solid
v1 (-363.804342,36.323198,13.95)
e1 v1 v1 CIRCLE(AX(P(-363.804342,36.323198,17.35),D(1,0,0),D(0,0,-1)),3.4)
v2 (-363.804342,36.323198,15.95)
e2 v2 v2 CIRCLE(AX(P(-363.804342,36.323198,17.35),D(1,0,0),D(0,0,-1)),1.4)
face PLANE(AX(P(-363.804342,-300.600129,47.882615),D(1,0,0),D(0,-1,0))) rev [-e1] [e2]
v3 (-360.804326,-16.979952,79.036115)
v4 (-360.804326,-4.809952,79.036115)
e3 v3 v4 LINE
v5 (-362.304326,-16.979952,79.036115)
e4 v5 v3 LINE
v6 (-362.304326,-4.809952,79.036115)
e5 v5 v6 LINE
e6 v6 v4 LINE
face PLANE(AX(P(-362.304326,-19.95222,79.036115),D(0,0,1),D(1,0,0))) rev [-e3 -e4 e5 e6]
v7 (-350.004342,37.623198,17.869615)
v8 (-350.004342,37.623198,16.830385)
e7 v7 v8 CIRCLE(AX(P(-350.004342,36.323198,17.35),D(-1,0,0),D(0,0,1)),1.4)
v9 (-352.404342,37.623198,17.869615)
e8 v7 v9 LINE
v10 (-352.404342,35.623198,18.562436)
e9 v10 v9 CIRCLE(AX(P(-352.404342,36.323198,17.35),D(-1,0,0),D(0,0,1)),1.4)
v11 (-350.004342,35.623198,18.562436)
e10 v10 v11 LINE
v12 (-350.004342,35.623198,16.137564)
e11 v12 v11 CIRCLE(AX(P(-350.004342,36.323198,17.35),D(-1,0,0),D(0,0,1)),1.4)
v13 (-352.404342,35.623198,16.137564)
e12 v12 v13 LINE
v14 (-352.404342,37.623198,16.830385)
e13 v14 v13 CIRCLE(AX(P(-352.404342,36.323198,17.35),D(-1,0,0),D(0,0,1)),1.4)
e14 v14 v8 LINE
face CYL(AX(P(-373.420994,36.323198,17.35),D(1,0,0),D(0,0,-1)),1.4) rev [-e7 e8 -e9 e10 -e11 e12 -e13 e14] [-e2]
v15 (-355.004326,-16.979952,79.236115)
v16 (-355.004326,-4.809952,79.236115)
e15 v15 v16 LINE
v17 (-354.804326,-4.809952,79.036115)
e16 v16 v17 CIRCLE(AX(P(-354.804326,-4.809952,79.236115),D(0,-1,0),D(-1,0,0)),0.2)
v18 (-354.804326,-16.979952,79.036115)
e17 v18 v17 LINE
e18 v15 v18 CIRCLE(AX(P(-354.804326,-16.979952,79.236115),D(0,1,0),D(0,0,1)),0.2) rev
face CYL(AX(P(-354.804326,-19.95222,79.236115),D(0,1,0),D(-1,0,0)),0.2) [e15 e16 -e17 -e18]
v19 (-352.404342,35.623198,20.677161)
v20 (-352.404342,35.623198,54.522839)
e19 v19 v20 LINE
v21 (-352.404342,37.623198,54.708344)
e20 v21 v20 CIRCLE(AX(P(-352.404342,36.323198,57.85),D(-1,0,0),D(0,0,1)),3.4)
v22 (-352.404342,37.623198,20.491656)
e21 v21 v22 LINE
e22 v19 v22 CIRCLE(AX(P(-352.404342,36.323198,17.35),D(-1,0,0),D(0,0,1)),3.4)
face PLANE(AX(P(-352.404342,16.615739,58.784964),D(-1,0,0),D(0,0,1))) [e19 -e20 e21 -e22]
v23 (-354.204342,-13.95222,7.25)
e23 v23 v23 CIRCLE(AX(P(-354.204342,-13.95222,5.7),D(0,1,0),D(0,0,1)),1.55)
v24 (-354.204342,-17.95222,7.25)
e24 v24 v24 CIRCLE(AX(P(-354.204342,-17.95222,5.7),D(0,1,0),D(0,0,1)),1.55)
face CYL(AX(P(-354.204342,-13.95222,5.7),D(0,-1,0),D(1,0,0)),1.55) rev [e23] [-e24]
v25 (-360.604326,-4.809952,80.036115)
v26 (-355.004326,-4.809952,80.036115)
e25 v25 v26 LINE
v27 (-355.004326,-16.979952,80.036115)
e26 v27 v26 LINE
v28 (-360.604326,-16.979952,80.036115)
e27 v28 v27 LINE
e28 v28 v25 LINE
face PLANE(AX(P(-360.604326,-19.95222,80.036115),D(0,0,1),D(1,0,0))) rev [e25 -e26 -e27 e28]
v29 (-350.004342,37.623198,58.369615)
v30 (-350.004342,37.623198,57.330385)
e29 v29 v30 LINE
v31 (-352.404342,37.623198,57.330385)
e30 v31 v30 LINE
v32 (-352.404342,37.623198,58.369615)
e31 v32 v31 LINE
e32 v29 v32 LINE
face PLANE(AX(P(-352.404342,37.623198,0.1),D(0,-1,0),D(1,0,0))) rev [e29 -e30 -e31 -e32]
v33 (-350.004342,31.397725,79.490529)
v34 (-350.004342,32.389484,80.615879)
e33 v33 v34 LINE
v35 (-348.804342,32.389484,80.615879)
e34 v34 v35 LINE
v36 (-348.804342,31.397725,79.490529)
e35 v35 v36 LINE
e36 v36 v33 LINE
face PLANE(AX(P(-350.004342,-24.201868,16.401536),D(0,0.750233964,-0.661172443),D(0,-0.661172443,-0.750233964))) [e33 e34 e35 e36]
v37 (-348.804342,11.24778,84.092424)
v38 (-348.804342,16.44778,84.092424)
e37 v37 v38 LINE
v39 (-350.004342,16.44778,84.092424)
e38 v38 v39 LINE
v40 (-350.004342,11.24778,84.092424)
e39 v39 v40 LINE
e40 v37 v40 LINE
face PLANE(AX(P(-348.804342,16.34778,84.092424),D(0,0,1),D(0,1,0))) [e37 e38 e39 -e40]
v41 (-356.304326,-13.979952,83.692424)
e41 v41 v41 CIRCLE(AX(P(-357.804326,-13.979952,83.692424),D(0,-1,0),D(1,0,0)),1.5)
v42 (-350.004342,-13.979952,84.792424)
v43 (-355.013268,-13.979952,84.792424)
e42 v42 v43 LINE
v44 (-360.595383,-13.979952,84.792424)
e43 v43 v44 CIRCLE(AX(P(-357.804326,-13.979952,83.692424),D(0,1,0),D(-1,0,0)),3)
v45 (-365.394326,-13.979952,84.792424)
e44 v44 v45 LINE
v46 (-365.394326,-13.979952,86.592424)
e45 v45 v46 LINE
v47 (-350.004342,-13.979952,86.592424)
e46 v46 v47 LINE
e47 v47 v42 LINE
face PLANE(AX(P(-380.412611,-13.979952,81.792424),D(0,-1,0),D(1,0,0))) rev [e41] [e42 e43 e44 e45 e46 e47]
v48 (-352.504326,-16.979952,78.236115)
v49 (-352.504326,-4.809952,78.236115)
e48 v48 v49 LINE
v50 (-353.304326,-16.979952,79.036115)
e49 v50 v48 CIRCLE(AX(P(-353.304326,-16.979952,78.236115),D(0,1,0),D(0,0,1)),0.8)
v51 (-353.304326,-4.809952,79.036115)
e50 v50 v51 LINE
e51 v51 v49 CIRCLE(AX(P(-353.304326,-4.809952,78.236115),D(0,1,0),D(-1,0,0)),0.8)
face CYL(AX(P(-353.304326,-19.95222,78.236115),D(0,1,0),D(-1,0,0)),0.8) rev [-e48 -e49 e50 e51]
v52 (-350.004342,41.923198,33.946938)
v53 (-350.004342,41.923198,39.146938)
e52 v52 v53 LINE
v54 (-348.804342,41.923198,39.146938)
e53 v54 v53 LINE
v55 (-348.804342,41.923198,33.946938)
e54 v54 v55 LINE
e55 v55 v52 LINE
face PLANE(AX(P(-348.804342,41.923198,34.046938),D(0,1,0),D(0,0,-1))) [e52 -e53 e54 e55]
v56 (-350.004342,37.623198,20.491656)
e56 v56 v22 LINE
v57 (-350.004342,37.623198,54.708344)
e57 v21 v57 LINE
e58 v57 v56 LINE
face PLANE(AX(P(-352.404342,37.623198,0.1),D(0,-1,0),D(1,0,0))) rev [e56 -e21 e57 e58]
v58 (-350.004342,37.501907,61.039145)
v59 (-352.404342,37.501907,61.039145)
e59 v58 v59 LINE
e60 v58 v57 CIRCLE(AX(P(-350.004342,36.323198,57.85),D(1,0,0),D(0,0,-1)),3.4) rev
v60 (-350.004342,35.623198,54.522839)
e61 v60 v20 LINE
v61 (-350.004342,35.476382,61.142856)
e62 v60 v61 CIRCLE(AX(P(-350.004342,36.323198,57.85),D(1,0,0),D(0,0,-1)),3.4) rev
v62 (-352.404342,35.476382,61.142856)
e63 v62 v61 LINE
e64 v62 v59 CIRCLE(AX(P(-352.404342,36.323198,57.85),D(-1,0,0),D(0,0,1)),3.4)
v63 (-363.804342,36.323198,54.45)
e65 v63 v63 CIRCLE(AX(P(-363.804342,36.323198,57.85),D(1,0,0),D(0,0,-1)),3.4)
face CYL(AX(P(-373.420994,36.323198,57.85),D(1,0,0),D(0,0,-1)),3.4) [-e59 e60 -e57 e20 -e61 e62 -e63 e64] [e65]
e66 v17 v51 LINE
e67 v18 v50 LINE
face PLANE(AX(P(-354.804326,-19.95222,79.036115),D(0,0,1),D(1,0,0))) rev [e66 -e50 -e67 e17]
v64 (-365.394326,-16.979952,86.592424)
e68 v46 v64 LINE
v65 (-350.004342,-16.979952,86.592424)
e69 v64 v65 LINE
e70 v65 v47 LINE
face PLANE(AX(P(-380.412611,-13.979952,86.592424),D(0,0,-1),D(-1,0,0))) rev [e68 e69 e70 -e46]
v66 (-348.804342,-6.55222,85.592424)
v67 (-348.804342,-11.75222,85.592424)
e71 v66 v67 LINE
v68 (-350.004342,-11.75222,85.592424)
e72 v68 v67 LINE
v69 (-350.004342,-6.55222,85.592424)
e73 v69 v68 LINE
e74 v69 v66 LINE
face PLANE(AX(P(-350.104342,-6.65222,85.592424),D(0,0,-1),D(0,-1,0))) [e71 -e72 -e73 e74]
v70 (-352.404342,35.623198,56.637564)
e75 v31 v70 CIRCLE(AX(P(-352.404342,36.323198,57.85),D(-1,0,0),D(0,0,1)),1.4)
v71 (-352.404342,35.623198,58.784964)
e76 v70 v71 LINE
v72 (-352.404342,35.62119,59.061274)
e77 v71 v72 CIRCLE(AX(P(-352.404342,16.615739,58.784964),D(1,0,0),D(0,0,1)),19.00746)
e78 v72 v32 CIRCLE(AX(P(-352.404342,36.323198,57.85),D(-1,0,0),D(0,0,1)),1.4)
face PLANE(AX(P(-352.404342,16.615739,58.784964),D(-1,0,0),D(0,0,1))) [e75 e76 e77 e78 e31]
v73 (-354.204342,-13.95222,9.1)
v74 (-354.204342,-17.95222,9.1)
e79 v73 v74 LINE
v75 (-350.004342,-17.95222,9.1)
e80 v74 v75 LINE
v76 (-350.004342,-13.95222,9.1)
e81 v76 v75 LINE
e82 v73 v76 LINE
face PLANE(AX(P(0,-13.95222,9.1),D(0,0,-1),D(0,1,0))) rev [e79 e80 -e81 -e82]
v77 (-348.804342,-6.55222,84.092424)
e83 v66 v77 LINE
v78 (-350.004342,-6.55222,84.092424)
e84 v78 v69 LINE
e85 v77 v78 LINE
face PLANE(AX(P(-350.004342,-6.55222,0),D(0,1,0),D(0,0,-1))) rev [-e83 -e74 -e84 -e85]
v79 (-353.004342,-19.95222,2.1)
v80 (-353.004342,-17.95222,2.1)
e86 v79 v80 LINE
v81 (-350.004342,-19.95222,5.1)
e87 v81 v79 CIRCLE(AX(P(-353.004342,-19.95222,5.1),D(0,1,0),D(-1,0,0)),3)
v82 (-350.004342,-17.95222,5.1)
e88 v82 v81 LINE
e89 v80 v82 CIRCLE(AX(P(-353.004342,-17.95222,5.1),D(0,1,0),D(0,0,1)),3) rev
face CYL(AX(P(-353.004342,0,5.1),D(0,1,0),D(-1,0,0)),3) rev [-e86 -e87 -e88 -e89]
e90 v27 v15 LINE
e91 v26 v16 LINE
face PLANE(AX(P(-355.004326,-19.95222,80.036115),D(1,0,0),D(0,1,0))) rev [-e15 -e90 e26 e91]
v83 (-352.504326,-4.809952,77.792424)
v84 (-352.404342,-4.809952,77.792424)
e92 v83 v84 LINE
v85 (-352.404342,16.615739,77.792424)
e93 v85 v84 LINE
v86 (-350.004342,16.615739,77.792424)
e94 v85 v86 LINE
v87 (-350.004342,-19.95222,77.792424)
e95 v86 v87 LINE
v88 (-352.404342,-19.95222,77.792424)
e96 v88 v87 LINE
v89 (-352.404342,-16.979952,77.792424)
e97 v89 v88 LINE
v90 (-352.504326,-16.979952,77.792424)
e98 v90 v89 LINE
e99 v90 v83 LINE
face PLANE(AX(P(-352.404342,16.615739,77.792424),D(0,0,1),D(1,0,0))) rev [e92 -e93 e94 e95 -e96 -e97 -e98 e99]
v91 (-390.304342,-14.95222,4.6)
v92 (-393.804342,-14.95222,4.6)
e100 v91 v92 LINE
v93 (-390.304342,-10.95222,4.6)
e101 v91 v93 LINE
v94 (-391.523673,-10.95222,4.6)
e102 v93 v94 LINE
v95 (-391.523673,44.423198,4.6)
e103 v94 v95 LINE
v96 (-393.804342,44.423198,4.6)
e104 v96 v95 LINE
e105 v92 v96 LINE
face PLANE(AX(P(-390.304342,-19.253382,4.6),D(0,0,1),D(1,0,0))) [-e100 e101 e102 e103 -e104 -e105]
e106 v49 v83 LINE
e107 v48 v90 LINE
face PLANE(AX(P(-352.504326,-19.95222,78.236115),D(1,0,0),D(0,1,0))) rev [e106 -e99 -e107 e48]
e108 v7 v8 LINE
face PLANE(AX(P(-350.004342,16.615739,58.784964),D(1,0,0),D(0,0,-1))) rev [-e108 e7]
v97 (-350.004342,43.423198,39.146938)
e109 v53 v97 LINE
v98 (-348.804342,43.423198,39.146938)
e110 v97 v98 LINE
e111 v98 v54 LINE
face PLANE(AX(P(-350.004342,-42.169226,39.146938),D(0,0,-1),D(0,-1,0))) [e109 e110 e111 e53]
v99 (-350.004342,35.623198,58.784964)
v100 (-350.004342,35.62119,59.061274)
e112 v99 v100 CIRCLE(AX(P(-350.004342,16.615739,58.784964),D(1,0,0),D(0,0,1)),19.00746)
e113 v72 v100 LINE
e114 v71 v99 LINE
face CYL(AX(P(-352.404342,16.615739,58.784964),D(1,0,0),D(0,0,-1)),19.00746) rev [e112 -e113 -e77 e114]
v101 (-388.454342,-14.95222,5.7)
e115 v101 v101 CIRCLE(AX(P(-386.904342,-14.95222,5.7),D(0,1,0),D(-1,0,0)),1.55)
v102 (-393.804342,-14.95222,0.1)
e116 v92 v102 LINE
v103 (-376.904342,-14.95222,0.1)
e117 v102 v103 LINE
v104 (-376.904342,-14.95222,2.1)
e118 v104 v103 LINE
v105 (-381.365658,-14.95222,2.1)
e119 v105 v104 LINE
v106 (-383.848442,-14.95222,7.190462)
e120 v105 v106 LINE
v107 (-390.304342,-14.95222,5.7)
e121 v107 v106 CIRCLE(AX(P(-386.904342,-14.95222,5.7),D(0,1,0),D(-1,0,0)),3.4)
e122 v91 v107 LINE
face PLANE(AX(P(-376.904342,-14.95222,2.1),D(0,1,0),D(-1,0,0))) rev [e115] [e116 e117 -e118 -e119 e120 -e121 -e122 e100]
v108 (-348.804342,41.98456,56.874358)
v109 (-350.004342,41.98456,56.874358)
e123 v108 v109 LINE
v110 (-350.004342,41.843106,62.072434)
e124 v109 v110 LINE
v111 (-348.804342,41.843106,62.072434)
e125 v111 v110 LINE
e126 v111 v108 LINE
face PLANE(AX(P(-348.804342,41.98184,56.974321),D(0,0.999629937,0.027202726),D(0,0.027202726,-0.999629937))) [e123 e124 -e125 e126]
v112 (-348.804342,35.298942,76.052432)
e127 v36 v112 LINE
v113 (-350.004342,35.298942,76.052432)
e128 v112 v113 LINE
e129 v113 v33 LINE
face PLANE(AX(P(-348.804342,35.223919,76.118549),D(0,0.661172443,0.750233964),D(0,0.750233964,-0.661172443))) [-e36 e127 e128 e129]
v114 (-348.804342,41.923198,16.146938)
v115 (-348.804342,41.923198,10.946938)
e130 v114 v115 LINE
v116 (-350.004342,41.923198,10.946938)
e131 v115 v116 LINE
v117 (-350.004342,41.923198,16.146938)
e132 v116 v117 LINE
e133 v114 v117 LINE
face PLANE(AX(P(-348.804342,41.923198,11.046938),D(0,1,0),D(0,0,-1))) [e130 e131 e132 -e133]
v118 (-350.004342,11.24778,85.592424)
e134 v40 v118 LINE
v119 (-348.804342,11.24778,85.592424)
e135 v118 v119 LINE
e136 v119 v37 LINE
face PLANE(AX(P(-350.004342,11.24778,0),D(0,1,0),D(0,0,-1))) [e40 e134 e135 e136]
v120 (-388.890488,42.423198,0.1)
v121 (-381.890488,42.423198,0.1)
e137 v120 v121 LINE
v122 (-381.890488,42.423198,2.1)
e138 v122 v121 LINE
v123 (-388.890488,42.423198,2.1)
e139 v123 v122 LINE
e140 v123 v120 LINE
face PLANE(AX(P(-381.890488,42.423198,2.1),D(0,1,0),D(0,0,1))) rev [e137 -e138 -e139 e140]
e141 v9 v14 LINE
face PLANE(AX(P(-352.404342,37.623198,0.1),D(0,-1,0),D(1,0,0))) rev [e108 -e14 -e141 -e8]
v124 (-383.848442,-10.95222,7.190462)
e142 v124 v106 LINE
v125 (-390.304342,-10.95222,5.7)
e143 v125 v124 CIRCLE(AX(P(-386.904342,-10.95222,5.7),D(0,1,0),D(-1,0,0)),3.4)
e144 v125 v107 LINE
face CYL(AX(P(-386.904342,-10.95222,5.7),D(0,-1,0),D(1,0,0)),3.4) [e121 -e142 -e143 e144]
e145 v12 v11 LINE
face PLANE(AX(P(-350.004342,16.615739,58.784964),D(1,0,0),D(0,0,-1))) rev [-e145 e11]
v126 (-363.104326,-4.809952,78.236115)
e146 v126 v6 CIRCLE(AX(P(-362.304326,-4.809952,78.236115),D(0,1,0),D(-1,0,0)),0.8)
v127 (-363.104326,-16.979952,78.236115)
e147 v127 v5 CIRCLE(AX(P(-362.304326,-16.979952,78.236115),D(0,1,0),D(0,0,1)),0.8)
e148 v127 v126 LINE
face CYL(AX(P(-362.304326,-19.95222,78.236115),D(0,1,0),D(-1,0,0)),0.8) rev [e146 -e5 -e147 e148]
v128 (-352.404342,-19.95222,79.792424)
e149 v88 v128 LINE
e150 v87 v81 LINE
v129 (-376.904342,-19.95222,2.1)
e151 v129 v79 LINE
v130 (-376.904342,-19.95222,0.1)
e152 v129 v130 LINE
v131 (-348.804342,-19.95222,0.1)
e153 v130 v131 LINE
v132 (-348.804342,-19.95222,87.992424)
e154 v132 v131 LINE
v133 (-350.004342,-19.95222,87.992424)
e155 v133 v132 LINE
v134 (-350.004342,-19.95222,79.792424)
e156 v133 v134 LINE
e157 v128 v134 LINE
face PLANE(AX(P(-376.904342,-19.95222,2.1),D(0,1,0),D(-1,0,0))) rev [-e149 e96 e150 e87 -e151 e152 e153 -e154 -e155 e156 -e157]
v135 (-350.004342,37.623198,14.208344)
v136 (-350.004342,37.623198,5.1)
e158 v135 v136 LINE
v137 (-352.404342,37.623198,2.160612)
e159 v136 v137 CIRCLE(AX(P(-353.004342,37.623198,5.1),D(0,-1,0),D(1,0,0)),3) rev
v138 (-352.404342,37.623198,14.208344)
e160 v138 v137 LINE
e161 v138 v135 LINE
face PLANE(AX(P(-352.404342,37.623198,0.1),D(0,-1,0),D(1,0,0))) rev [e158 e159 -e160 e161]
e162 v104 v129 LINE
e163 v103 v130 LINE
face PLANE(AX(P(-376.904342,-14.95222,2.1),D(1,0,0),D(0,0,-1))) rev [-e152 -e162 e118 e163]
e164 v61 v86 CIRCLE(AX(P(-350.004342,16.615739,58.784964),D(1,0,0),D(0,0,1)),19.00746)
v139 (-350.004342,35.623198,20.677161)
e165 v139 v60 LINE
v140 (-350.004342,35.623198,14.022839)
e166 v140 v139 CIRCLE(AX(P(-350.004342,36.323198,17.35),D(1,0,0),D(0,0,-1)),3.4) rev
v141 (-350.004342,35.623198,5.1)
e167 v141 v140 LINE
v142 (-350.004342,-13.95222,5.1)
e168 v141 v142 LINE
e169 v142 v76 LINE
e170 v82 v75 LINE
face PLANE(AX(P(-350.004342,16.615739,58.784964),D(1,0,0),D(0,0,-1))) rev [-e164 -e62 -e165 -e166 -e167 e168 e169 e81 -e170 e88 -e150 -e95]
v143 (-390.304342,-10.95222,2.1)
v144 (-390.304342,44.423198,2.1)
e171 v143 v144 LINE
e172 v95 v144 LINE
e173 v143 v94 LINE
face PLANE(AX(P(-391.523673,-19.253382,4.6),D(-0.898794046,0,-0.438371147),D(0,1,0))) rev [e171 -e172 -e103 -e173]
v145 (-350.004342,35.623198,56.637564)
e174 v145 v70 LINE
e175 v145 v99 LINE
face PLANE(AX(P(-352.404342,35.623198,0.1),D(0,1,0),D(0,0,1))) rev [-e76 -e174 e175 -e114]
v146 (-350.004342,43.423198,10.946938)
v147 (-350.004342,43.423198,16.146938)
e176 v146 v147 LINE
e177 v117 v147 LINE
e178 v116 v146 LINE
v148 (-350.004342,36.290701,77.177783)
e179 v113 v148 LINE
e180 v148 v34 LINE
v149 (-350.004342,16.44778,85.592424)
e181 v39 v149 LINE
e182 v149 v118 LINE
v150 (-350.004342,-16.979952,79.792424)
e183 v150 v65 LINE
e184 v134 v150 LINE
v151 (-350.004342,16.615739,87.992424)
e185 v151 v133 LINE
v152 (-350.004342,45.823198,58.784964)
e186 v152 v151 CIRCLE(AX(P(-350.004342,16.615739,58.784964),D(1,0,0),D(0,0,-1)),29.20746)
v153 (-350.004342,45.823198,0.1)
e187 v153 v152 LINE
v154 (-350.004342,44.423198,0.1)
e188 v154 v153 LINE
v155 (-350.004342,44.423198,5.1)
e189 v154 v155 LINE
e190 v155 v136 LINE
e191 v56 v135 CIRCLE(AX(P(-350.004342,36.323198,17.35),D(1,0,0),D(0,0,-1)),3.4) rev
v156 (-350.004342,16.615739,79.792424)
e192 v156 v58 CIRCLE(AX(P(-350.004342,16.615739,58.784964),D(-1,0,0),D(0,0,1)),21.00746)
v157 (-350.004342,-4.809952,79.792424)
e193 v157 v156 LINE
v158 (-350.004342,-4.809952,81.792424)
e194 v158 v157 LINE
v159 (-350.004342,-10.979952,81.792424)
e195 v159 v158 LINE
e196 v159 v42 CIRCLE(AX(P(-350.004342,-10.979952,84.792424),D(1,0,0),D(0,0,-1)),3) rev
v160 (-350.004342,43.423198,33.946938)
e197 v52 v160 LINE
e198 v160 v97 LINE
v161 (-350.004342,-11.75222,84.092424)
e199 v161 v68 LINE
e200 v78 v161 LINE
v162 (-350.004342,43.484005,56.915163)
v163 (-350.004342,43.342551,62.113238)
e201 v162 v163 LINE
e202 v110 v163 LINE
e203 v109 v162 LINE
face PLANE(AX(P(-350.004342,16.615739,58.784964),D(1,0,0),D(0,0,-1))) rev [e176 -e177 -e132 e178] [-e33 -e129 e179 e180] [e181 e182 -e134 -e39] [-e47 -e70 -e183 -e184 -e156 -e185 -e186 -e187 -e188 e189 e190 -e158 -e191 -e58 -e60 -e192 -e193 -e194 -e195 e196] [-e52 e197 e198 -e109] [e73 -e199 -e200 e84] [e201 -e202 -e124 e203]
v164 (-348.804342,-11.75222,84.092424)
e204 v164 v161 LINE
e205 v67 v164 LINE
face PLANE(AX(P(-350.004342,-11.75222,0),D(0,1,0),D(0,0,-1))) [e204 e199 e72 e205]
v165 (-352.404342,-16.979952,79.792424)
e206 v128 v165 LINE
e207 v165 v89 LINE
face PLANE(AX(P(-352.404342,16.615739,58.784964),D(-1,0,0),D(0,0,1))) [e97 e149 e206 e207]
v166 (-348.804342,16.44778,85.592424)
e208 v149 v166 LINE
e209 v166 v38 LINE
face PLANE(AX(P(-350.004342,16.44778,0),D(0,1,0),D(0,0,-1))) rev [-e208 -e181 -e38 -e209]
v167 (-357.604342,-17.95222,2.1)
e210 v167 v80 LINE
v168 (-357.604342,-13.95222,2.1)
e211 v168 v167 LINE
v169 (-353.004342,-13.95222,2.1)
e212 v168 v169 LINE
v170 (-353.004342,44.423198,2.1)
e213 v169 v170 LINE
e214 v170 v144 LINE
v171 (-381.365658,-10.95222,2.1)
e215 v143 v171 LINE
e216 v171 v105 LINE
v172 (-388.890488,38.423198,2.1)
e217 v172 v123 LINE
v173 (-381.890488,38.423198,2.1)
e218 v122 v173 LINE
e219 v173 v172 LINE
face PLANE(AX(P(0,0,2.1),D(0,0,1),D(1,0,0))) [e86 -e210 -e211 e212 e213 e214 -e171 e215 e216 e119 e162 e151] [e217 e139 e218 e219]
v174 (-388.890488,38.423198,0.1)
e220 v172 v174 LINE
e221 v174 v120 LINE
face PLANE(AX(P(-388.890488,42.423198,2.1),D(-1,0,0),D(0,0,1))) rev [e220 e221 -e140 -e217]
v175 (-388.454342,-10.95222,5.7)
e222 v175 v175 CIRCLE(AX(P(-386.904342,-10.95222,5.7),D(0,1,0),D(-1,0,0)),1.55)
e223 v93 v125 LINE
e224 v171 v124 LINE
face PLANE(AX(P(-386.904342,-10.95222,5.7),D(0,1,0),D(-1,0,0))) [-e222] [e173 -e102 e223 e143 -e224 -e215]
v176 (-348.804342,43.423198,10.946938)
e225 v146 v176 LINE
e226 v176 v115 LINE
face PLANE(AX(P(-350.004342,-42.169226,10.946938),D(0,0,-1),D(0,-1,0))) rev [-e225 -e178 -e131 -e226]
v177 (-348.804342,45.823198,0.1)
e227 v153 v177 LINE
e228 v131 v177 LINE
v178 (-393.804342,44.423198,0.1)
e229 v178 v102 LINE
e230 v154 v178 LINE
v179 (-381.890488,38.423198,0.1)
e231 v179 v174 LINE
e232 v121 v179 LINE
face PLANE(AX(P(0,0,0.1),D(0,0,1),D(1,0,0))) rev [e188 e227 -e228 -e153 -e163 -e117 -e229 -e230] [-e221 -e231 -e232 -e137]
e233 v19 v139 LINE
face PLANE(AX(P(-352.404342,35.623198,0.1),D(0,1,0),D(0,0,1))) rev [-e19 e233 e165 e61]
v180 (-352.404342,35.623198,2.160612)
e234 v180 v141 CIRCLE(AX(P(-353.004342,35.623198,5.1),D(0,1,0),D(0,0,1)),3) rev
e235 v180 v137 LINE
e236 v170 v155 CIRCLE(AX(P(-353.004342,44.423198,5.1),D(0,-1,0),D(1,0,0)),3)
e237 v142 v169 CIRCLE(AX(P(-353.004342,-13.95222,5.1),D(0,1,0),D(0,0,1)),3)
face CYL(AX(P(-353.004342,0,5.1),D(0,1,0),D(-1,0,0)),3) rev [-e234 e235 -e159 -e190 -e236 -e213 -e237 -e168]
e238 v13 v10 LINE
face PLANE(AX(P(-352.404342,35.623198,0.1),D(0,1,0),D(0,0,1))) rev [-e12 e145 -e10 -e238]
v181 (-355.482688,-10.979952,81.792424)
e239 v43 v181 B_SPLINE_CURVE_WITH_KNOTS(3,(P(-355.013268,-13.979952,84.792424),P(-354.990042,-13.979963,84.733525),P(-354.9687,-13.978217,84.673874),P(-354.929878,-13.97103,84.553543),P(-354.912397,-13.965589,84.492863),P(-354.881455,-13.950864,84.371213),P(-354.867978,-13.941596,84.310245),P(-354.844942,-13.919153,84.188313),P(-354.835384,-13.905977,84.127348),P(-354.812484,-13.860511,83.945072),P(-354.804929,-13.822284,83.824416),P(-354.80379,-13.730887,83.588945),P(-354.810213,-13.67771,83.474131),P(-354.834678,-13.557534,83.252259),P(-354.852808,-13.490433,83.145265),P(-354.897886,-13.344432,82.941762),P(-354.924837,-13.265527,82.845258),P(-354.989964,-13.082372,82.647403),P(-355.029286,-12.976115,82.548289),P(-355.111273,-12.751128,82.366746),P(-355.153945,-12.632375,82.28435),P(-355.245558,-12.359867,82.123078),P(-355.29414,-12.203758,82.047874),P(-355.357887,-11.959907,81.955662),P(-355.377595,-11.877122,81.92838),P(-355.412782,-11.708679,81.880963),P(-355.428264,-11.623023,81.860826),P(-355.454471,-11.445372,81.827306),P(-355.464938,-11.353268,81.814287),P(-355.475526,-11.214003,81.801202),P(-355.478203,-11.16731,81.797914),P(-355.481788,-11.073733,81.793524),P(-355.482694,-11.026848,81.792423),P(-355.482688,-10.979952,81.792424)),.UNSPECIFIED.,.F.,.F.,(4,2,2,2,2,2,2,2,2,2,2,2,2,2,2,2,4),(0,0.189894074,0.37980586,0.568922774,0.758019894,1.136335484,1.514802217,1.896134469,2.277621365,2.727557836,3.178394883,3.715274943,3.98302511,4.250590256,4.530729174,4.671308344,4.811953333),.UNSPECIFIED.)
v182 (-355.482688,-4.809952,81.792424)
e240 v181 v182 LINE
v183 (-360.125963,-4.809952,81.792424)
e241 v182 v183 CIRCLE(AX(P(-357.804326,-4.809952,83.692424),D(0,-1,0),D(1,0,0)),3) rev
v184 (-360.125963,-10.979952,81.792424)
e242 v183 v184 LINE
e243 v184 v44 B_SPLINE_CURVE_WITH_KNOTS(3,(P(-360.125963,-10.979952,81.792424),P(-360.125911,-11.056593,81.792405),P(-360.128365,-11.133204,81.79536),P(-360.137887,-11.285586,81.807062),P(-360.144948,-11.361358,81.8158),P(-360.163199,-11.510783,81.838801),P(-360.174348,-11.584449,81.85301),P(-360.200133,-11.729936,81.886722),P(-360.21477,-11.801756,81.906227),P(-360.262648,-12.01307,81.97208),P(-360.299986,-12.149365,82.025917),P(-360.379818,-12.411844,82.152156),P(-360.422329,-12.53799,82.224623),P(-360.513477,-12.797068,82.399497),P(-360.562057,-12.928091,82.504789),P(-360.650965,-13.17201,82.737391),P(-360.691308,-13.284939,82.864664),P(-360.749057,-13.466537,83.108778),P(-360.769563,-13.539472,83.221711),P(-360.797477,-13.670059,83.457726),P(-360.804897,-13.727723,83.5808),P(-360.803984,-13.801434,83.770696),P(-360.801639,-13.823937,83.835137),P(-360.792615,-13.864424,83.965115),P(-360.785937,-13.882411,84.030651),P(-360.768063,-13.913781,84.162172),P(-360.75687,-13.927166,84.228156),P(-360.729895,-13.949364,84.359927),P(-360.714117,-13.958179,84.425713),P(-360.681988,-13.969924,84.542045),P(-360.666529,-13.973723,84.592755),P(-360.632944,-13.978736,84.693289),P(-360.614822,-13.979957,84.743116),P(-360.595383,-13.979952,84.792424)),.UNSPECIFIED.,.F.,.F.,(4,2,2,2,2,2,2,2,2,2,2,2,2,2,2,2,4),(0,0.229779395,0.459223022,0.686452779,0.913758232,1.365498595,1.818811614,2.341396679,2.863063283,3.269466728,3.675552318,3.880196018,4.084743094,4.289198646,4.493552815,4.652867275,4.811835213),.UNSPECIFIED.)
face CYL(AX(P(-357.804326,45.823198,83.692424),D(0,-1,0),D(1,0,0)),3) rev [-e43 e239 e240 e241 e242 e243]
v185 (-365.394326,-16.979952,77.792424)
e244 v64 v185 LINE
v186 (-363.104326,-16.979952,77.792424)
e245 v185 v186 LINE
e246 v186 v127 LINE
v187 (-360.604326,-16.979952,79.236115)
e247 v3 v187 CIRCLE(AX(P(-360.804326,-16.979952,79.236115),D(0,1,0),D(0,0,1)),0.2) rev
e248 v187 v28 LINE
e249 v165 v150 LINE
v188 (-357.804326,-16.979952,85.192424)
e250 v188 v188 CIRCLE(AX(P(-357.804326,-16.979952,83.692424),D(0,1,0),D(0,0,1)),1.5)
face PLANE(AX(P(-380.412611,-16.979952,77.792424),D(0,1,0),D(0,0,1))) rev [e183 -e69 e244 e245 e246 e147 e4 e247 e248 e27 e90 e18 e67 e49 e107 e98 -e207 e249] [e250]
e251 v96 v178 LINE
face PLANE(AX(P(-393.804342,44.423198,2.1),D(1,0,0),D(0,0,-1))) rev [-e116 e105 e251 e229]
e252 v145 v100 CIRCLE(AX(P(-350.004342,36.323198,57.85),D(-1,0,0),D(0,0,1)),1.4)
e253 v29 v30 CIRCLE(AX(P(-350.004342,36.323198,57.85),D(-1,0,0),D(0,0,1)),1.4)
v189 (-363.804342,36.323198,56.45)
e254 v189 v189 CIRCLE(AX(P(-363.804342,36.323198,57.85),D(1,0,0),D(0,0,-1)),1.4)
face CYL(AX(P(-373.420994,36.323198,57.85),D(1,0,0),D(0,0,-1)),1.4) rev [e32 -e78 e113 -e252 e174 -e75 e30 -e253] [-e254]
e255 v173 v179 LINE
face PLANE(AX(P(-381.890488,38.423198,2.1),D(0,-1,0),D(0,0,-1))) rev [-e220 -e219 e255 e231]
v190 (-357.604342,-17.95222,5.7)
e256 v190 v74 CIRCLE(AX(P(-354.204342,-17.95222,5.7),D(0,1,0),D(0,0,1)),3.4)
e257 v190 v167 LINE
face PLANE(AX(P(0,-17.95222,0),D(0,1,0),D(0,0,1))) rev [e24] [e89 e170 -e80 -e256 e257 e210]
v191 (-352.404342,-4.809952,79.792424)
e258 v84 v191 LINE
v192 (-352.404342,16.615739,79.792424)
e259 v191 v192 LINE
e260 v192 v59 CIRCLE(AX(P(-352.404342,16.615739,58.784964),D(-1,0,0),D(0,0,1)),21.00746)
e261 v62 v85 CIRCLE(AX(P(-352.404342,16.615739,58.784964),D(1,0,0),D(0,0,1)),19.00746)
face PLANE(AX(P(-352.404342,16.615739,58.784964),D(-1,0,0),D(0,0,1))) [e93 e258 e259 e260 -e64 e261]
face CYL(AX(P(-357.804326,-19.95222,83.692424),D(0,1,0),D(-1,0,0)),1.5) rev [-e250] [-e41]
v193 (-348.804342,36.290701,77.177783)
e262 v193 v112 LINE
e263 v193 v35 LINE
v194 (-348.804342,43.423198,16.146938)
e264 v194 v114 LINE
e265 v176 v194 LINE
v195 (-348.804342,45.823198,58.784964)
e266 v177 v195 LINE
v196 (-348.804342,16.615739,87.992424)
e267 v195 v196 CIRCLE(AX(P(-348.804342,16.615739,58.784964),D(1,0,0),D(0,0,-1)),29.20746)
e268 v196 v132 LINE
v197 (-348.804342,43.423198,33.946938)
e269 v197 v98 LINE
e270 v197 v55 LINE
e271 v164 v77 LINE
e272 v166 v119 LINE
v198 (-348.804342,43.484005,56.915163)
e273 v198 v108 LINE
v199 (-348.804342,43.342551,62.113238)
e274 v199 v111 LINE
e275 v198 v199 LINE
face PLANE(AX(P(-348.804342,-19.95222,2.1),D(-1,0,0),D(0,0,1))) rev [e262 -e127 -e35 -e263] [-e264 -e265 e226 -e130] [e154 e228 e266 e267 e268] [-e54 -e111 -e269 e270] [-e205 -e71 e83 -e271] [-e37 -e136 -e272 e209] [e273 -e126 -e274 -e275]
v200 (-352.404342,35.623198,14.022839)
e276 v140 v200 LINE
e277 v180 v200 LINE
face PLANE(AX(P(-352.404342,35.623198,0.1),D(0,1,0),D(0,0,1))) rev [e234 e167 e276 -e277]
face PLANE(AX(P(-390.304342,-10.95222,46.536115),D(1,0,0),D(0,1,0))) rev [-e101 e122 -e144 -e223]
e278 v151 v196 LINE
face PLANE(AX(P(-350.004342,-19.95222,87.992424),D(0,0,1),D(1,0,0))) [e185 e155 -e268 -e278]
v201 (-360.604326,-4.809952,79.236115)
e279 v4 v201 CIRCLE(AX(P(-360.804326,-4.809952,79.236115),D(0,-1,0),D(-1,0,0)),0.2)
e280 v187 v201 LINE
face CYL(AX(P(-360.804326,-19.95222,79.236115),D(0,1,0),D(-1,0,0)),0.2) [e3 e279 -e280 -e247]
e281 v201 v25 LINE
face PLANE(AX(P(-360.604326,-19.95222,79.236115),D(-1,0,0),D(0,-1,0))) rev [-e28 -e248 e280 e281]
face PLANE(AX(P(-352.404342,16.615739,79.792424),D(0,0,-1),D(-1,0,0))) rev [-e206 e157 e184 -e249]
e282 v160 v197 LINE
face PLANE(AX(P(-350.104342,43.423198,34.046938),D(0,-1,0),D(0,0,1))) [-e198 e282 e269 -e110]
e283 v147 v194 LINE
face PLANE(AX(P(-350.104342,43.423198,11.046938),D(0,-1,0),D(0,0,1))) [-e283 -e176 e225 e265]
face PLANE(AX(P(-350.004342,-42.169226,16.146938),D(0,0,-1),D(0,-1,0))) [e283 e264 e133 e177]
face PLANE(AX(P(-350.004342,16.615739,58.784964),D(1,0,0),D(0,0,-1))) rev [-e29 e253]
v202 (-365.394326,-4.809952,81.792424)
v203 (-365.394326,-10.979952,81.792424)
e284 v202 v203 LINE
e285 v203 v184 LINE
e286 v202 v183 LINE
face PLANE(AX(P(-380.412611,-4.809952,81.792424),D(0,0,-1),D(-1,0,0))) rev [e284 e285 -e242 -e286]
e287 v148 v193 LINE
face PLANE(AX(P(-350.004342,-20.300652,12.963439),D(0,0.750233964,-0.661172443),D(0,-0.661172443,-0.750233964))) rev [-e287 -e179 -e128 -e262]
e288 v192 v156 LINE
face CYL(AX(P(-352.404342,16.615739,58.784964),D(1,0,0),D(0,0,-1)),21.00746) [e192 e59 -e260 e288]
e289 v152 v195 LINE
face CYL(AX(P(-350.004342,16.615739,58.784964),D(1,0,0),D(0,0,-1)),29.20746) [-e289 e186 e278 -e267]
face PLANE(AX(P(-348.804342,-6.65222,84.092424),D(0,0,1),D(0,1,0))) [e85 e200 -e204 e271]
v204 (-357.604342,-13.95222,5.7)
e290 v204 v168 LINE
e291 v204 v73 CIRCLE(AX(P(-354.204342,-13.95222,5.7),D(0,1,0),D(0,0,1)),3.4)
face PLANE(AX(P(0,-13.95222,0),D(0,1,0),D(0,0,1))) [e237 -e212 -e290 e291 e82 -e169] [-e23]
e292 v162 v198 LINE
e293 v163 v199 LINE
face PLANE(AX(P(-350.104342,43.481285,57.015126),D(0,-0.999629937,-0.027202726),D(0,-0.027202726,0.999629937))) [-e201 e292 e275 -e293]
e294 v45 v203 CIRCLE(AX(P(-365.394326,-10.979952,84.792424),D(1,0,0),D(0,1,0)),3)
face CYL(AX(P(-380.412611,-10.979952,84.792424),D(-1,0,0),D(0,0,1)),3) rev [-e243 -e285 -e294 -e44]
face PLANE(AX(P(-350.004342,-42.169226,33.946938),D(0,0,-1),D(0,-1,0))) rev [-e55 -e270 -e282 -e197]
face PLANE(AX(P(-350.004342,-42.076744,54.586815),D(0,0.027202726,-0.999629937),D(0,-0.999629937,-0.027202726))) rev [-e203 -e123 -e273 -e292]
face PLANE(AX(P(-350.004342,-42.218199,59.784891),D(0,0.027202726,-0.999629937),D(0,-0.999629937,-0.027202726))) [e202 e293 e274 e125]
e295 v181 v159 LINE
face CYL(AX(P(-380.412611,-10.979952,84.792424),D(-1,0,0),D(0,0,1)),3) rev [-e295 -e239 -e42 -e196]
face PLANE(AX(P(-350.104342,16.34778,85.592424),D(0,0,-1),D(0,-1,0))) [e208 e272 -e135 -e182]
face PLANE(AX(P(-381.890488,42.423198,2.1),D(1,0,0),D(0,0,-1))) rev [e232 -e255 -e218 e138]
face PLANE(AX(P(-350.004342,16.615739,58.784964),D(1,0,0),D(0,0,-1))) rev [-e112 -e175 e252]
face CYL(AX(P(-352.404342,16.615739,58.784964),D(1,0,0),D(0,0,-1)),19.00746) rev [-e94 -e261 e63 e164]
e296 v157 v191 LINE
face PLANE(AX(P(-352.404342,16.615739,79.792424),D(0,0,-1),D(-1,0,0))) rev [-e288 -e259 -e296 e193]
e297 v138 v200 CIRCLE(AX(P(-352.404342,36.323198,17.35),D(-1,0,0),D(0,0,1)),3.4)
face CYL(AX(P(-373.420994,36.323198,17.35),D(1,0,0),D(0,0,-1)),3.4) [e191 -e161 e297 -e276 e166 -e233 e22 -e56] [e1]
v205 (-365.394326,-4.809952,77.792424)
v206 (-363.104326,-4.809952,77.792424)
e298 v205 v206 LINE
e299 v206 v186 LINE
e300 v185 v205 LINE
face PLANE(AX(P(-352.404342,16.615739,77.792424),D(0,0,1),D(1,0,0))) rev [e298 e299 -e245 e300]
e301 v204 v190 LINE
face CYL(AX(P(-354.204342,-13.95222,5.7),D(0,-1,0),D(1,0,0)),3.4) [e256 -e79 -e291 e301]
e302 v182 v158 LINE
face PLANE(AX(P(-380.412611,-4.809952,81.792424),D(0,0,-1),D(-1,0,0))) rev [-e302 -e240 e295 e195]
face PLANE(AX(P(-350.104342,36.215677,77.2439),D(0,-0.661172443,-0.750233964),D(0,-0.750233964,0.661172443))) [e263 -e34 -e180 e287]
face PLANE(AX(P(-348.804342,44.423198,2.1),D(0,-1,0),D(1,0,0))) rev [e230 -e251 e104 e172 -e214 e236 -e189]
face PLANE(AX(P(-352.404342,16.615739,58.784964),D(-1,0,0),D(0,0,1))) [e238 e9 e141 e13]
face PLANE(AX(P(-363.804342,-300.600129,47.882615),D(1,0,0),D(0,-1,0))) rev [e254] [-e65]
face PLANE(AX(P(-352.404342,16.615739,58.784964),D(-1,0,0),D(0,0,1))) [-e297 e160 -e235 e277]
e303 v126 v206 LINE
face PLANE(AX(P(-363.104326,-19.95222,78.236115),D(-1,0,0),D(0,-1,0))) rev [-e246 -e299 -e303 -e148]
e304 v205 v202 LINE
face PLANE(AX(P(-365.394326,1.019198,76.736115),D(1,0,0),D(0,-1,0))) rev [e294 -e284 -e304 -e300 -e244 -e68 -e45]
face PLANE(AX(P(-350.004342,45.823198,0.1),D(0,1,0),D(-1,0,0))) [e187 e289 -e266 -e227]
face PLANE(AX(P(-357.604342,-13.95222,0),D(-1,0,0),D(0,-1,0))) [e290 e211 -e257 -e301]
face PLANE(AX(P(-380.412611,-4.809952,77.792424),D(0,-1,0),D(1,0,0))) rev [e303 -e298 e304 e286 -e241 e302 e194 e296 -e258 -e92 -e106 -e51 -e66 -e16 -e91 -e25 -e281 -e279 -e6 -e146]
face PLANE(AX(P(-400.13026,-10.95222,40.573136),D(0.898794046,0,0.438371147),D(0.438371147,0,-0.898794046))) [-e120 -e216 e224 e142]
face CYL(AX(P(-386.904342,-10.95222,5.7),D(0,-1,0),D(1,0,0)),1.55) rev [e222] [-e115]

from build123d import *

# Parameters (mm, degrees)
EXTRUDE_1_DEPTH     = 2
EXTRUDE_2_DEPTH     = 1.2
SKETCH_4_R          = 1.55
EXTRUDE_3_DEPTH     = 4
EXTRUDE_START       = 3
SKETCH_4_3_R        = 1.55
EXTRUDE_4_DEPTH     = 4
FILLET_1_R          = 3
SKETCH_5_W          = 3.5
SKETCH_5_H          = 2.5
EXTRUDE_5_DEPTH     = 59.375418161
SKETCH_9_W          = 7
SKETCH_9_H          = 4
CUT_EXTRUDE_3_DEPTH = 2
OTHER_START         = -350.004341608
OTHER_1_OUTLINE_W   = 1.5
OTHER_1_OUTLINE_H   = 5.2
OTHER_1_OUTLINE_W_2 = 5.2
OTHER_1_OUTLINE_H_2 = 1.5
OTHER_1_DEPTH       = 1.2
SKETCH_10_R         = 3.4
SKETCH_10_R_2       = 1.4
EXTRUDE_6_DEPTH     = 13.8
EXTRUDE_7_DEPTH     = 2.4
CHAMFER_1_SIZE2     = 1.219331471
CHAMFER_1_SIZE      = 2.5
EXTRUDE_9_DEPTH     = 15.389983971
SKETCH_15_R         = 1.5
CUT_EXTRUDE_4_DEPTH = 407.679532375
FILLET_2_R          = 3
SKETCH_16_R         = 3
CUT_EXTRUDE_5_DEPTH = 408.922716855


# Read off the part's stored shape, not the designer's step: Отступ1
# Some blends are built 0.0001 mm under size
with BuildPart() as part:
    # Эскиз2 → Бобышка-Вытянуть1 (new body)
    with BuildSketch(Plane.XY.offset(0.1)):
        Polygon((-376.904341608, -14.952219826), (-393.804341608, -14.952219826), (-393.804341608, 44.423198335), (-348.804341608, 44.423198335), (-348.804341608, -19.952219826), (-376.904341608, -19.952219826), align=None)
    extrude(amount=EXTRUDE_1_DEPTH)

    # Эскиз3 → Бобышка-Вытянуть2 (add)
    with BuildSketch(Plane(origin=(-348.804341608, 0, 0), x_dir=(0, 0, -1), z_dir=(1, 0, 0))):
        with BuildLine():
            Line((-0.1, -19.952219826), (-0.1, 45.823198335))
            Line((-0.1, 45.823198335), (-58.7849644, 45.823198335))
            ThreePointArc((-58.7849644, 45.823198335), (-79.43775717, 37.268531468), (-87.992424037, 16.615738698))
            Line((-87.992424037, 16.615738698), (-87.992424037, -19.952219826))
            Line((-87.992424037, -19.952219826), (-0.1, -19.952219826))
        make_face()
    extrude(amount=-EXTRUDE_2_DEPTH)

    # Эскиз4 → Бобышка-Вытянуть3 (add)
    with BuildSketch(Plane(origin=(0, -17.952219826, 0), x_dir=(1, 0, 0), z_dir=(0, 1, 0))):
        with BuildLine():
            Line((-357.604341608, -2.1), (-357.604341608, -5.7))
            ThreePointArc((-357.604341608, -5.7), (-356.608504664, -8.104163056), (-354.204341608, -9.1))
            Line((-354.204341608, -9.1), (-350.004341608, -9.1))
            Line((-350.004341608, -9.1), (-350.004341608, -2.1))
            Line((-350.004341608, -2.1), (-357.604341608, -2.1))
        make_face()
        with Locations(Location((-354.204341608, -5.7, 0), (0, 0, 270))):
            Circle(SKETCH_4_R, mode=Mode.SUBTRACT)
    extrude(amount=EXTRUDE_3_DEPTH)

    # Эскиз4<3> → Бобышка-Вытянуть4 (add)
    with BuildSketch(Plane(origin=(0, -17.952219826, 0), x_dir=(1, 0, 0), z_dir=(0, 1, 0)).offset(EXTRUDE_START)):
        with BuildLine():
            Line((-390.304341608, -5.7), (-390.304341608, -2.1))
            Line((-390.304341608, -2.1), (-381.365657691, -2.1))
            Line((-381.365657691, -2.1), (-383.84844185, -7.190461899))
            ThreePointArc((-383.84844185, -7.190461899), (-387.669175192, -9.01285822), (-390.304341608, -5.7))
        make_face()
        with Locations(Location((-386.904341608, -5.7, 0), (0, 0, 180))):
            Circle(SKETCH_4_3_R, mode=Mode.SUBTRACT)
    extrude(amount=EXTRUDE_4_DEPTH)

    # Скругление1
    fillet_1_edges = [part.edges().sort_by_distance(p)[0] for p in [
        (-350.004341608, -18.952219826, 2.1),
        (-350.004341608, 15.235489254, 2.1),
    ]]
    fillet(fillet_1_edges, radius=FILLET_1_R)

    # Эскиз5 → Бобышка-Вытянуть5 (add)
    with BuildSketch(Plane(origin=(0, 44.423198335, 0), x_dir=(1, 0, 0), z_dir=(0, 1, 0))):
        with Locations((-392.054341608, -3.35)):
            Rectangle(SKETCH_5_W, SKETCH_5_H)
    extrude(amount=-EXTRUDE_5_DEPTH)

    # Эскиз9 → Вырез-Вытянуть3 (cut)
    with BuildSketch(Plane(origin=(0, 0, 0.1), x_dir=(-1, 0, 0), z_dir=(0, 0, -1))):
        with Locations((385.390488384, 40.423198335)):
            Rectangle(SKETCH_9_W, SKETCH_9_H)
    extrude(amount=-CUT_EXTRUDE_3_DEPTH, mode=Mode.SUBTRACT)

    # Отступ1 outline → Отступ1 (cut)
    with BuildSketch(Plane.YZ.offset(OTHER_START)):
        with Locations((42.673198335, 13.546937644)):
            Rectangle(OTHER_1_OUTLINE_W, OTHER_1_OUTLINE_H)
        with Locations((42.673198335, 36.546937644)):
            Rectangle(OTHER_1_OUTLINE_W, OTHER_1_OUTLINE_H)
        Polygon((41.843105902, 62.072434127), (41.984560077, 56.874358452), (43.484004983, 56.915162541), (43.342550808, 62.113238216), align=None)
        Polygon((31.397725301, 79.490528515), (35.298941914, 76.052431812), (36.290700579, 77.177782758), (32.389483966, 80.615879461), align=None)
        with Locations((13.847780174, 84.842424037)):
            Rectangle(OTHER_1_OUTLINE_W_2, OTHER_1_OUTLINE_H_2)
        with Locations((-9.152219826, 84.842424037)):
            Rectangle(OTHER_1_OUTLINE_W_2, OTHER_1_OUTLINE_H_2)
    extrude(amount=OTHER_1_DEPTH, mode=Mode.SUBTRACT)

    # Эскиз10 → Бобышка-Вытянуть6 (add)
    # profile 1 of 2: a face of its own
    with BuildSketch(Plane.ZY.offset(350.004341608)):
        with Locations(Location((57.85, 36.323198334, 0), (0, 0, 180))):
            Circle(SKETCH_10_R)
        with Locations(Location((57.85, 36.323198334, 0), (0, 0, 180))):
            Circle(SKETCH_10_R_2, mode=Mode.SUBTRACT)
    # profile 2 of 2: a face of its own
    with BuildSketch(Plane.ZY.offset(350.004341608)):
        with Locations(Location((17.35, 36.323198334, 0), (0, 0, 180))):
            Circle(SKETCH_10_R)
        with Locations(Location((17.35, 36.323198334, 0), (0, 0, 180))):
            Circle(SKETCH_10_R_2, mode=Mode.SUBTRACT)
    extrude(amount=EXTRUDE_6_DEPTH)

    # Эскиз12 → Бобышка-Вытянуть7 (add)
    with BuildSketch(Plane.ZY.offset(350.004341608)):
        with BuildLine():
            Line((77.792424037, 16.615738698), (77.792424037, -19.952219826))
            Line((77.792424037, -19.952219826), (79.792424037, -19.952219826))
            Line((79.792424037, -19.952219826), (79.792424037, 16.615738698))
            ThreePointArc((79.792424037, 16.615738698), (73.639481564, 31.470255863), (58.7849644, 37.623198335))
            Line((58.7849644, 37.623198335), (0.1, 37.623198335))
            Line((0.1, 37.623198335), (0.1, 35.623198335))
            Line((0.1, 35.623198335), (58.7849644, 35.623198335))
            ThreePointArc((58.7849644, 35.623198335), (72.225268002, 30.0560423), (77.792424037, 16.615738698))
        make_face()
    extrude(amount=EXTRUDE_7_DEPTH)

    # Фаска1
    chamfer_1_edges = [part.edges().sort_by_distance(p)[0] for p in [
        (-390.304341608, 16.735489254, 4.6),
    ]]
    chamfer_1_side = [part.faces().sort_by_distance(p)[0] for p in [
        (-390.304341608, 16.735489254, 4.575613371),
    ]]
    chamfer(chamfer_1_edges, length=CHAMFER_1_SIZE - 0.0001, length2=CHAMFER_1_SIZE2 - 0.0001, reference=chamfer_1_side[0])  # a hair under: the kernel refuses the full size

    # Эскиз14 → Бобышка-Вытянуть9 (add)
    with BuildSketch(Plane.ZY.offset(350.004341608)):
        Polygon((77.792424037, -16.979951829), (86.592424037, -16.979951829), (86.592424037, -13.979951829), (81.792424037, -13.979951829), (81.792424037, -4.809951829), (77.792424037, -4.809951829), align=None)
    extrude(amount=EXTRUDE_9_DEPTH)

    # Эскиз15 → Вырез-Вытянуть4 (cut, through all)
    with BuildSketch(Plane(origin=(0, -4.809951829, 0), x_dir=(1, 0, 0), z_dir=(0, 1, 0))):
        with Locations(Location((-357.804325578, -83.692424037, 0), (0, 0, 270))):
            Circle(SKETCH_15_R)
        with BuildLine():
            Line((-363.104325578, -78.236115217), (-363.104325578, -76.736115217))
            Line((-363.104325578, -76.736115217), (-352.504325578, -76.736115217))
            Line((-352.504325578, -76.736115217), (-352.504325578, -78.236115217))
            ThreePointArc((-352.504325578, -78.236115217), (-352.738640153, -78.801800642), (-353.304325578, -79.036115217))
            Line((-353.304325578, -79.036115217), (-354.804325578, -79.036115217))
            ThreePointArc((-354.804325578, -79.036115217), (-354.945746935, -79.09469386), (-355.004325578, -79.236115217))
            Line((-355.004325578, -79.236115217), (-355.004325578, -80.036115217))
            Line((-355.004325578, -80.036115217), (-360.604325578, -80.036115217))
            Line((-360.604325578, -80.036115217), (-360.604325578, -79.236115217))
            ThreePointArc((-360.604325578, -79.236115217), (-360.662904222, -79.09469386), (-360.804325578, -79.036115217))
            Line((-360.804325578, -79.036115217), (-362.304325578, -79.036115217))
            ThreePointArc((-362.304325578, -79.036115217), (-362.870011003, -78.801800642), (-363.104325578, -78.236115217))
        make_face()
    extrude(amount=-CUT_EXTRUDE_4_DEPTH, mode=Mode.SUBTRACT)

    # Скругление2
    # the kernel refuses this fillet: 3 mm, written as the material it adds along each edge
    with BuildSketch(Plane(origin=(-350.004341608, -13.979951829, 81.792424037), x_dir=(0, 1, 0), z_dir=(-1, 0, 0))) as fillet_2_piece_1_section:
        with BuildLine():
            CenterArc((FILLET_2_R, -FILLET_2_R), FILLET_2_R, 90, 90)
            Line((0, -FILLET_2_R), (0, 0))
            Line((0, 0), (FILLET_2_R, 0))
        make_face()
    fillet_2_piece_1 = extrude(amount=15.389983971, mode=Mode.PRIVATE)
    fillet_2_piece_1 = fillet_2_piece_1 - Plane(origin=(-357.804325578, -11.764674138, 83.692424037), x_dir=(0, 0, 1), z_dir=(0, 1, 0)) * Cylinder(1.5, 43, mode=Mode.PRIVATE)
    add(fillet_2_piece_1)

    # Эскиз16 → Вырез-Вытянуть5 (cut, through all)
    with BuildSketch(Plane(origin=(0, -13.979951829, 0), x_dir=(1, 0, 0), z_dir=(0, 1, 0))):
        with Locations((-357.804325578, -83.692424037)):
            Circle(SKETCH_16_R)
    extrude(amount=CUT_EXTRUDE_5_DEPTH, mode=Mode.SUBTRACT)


solid = part.part
